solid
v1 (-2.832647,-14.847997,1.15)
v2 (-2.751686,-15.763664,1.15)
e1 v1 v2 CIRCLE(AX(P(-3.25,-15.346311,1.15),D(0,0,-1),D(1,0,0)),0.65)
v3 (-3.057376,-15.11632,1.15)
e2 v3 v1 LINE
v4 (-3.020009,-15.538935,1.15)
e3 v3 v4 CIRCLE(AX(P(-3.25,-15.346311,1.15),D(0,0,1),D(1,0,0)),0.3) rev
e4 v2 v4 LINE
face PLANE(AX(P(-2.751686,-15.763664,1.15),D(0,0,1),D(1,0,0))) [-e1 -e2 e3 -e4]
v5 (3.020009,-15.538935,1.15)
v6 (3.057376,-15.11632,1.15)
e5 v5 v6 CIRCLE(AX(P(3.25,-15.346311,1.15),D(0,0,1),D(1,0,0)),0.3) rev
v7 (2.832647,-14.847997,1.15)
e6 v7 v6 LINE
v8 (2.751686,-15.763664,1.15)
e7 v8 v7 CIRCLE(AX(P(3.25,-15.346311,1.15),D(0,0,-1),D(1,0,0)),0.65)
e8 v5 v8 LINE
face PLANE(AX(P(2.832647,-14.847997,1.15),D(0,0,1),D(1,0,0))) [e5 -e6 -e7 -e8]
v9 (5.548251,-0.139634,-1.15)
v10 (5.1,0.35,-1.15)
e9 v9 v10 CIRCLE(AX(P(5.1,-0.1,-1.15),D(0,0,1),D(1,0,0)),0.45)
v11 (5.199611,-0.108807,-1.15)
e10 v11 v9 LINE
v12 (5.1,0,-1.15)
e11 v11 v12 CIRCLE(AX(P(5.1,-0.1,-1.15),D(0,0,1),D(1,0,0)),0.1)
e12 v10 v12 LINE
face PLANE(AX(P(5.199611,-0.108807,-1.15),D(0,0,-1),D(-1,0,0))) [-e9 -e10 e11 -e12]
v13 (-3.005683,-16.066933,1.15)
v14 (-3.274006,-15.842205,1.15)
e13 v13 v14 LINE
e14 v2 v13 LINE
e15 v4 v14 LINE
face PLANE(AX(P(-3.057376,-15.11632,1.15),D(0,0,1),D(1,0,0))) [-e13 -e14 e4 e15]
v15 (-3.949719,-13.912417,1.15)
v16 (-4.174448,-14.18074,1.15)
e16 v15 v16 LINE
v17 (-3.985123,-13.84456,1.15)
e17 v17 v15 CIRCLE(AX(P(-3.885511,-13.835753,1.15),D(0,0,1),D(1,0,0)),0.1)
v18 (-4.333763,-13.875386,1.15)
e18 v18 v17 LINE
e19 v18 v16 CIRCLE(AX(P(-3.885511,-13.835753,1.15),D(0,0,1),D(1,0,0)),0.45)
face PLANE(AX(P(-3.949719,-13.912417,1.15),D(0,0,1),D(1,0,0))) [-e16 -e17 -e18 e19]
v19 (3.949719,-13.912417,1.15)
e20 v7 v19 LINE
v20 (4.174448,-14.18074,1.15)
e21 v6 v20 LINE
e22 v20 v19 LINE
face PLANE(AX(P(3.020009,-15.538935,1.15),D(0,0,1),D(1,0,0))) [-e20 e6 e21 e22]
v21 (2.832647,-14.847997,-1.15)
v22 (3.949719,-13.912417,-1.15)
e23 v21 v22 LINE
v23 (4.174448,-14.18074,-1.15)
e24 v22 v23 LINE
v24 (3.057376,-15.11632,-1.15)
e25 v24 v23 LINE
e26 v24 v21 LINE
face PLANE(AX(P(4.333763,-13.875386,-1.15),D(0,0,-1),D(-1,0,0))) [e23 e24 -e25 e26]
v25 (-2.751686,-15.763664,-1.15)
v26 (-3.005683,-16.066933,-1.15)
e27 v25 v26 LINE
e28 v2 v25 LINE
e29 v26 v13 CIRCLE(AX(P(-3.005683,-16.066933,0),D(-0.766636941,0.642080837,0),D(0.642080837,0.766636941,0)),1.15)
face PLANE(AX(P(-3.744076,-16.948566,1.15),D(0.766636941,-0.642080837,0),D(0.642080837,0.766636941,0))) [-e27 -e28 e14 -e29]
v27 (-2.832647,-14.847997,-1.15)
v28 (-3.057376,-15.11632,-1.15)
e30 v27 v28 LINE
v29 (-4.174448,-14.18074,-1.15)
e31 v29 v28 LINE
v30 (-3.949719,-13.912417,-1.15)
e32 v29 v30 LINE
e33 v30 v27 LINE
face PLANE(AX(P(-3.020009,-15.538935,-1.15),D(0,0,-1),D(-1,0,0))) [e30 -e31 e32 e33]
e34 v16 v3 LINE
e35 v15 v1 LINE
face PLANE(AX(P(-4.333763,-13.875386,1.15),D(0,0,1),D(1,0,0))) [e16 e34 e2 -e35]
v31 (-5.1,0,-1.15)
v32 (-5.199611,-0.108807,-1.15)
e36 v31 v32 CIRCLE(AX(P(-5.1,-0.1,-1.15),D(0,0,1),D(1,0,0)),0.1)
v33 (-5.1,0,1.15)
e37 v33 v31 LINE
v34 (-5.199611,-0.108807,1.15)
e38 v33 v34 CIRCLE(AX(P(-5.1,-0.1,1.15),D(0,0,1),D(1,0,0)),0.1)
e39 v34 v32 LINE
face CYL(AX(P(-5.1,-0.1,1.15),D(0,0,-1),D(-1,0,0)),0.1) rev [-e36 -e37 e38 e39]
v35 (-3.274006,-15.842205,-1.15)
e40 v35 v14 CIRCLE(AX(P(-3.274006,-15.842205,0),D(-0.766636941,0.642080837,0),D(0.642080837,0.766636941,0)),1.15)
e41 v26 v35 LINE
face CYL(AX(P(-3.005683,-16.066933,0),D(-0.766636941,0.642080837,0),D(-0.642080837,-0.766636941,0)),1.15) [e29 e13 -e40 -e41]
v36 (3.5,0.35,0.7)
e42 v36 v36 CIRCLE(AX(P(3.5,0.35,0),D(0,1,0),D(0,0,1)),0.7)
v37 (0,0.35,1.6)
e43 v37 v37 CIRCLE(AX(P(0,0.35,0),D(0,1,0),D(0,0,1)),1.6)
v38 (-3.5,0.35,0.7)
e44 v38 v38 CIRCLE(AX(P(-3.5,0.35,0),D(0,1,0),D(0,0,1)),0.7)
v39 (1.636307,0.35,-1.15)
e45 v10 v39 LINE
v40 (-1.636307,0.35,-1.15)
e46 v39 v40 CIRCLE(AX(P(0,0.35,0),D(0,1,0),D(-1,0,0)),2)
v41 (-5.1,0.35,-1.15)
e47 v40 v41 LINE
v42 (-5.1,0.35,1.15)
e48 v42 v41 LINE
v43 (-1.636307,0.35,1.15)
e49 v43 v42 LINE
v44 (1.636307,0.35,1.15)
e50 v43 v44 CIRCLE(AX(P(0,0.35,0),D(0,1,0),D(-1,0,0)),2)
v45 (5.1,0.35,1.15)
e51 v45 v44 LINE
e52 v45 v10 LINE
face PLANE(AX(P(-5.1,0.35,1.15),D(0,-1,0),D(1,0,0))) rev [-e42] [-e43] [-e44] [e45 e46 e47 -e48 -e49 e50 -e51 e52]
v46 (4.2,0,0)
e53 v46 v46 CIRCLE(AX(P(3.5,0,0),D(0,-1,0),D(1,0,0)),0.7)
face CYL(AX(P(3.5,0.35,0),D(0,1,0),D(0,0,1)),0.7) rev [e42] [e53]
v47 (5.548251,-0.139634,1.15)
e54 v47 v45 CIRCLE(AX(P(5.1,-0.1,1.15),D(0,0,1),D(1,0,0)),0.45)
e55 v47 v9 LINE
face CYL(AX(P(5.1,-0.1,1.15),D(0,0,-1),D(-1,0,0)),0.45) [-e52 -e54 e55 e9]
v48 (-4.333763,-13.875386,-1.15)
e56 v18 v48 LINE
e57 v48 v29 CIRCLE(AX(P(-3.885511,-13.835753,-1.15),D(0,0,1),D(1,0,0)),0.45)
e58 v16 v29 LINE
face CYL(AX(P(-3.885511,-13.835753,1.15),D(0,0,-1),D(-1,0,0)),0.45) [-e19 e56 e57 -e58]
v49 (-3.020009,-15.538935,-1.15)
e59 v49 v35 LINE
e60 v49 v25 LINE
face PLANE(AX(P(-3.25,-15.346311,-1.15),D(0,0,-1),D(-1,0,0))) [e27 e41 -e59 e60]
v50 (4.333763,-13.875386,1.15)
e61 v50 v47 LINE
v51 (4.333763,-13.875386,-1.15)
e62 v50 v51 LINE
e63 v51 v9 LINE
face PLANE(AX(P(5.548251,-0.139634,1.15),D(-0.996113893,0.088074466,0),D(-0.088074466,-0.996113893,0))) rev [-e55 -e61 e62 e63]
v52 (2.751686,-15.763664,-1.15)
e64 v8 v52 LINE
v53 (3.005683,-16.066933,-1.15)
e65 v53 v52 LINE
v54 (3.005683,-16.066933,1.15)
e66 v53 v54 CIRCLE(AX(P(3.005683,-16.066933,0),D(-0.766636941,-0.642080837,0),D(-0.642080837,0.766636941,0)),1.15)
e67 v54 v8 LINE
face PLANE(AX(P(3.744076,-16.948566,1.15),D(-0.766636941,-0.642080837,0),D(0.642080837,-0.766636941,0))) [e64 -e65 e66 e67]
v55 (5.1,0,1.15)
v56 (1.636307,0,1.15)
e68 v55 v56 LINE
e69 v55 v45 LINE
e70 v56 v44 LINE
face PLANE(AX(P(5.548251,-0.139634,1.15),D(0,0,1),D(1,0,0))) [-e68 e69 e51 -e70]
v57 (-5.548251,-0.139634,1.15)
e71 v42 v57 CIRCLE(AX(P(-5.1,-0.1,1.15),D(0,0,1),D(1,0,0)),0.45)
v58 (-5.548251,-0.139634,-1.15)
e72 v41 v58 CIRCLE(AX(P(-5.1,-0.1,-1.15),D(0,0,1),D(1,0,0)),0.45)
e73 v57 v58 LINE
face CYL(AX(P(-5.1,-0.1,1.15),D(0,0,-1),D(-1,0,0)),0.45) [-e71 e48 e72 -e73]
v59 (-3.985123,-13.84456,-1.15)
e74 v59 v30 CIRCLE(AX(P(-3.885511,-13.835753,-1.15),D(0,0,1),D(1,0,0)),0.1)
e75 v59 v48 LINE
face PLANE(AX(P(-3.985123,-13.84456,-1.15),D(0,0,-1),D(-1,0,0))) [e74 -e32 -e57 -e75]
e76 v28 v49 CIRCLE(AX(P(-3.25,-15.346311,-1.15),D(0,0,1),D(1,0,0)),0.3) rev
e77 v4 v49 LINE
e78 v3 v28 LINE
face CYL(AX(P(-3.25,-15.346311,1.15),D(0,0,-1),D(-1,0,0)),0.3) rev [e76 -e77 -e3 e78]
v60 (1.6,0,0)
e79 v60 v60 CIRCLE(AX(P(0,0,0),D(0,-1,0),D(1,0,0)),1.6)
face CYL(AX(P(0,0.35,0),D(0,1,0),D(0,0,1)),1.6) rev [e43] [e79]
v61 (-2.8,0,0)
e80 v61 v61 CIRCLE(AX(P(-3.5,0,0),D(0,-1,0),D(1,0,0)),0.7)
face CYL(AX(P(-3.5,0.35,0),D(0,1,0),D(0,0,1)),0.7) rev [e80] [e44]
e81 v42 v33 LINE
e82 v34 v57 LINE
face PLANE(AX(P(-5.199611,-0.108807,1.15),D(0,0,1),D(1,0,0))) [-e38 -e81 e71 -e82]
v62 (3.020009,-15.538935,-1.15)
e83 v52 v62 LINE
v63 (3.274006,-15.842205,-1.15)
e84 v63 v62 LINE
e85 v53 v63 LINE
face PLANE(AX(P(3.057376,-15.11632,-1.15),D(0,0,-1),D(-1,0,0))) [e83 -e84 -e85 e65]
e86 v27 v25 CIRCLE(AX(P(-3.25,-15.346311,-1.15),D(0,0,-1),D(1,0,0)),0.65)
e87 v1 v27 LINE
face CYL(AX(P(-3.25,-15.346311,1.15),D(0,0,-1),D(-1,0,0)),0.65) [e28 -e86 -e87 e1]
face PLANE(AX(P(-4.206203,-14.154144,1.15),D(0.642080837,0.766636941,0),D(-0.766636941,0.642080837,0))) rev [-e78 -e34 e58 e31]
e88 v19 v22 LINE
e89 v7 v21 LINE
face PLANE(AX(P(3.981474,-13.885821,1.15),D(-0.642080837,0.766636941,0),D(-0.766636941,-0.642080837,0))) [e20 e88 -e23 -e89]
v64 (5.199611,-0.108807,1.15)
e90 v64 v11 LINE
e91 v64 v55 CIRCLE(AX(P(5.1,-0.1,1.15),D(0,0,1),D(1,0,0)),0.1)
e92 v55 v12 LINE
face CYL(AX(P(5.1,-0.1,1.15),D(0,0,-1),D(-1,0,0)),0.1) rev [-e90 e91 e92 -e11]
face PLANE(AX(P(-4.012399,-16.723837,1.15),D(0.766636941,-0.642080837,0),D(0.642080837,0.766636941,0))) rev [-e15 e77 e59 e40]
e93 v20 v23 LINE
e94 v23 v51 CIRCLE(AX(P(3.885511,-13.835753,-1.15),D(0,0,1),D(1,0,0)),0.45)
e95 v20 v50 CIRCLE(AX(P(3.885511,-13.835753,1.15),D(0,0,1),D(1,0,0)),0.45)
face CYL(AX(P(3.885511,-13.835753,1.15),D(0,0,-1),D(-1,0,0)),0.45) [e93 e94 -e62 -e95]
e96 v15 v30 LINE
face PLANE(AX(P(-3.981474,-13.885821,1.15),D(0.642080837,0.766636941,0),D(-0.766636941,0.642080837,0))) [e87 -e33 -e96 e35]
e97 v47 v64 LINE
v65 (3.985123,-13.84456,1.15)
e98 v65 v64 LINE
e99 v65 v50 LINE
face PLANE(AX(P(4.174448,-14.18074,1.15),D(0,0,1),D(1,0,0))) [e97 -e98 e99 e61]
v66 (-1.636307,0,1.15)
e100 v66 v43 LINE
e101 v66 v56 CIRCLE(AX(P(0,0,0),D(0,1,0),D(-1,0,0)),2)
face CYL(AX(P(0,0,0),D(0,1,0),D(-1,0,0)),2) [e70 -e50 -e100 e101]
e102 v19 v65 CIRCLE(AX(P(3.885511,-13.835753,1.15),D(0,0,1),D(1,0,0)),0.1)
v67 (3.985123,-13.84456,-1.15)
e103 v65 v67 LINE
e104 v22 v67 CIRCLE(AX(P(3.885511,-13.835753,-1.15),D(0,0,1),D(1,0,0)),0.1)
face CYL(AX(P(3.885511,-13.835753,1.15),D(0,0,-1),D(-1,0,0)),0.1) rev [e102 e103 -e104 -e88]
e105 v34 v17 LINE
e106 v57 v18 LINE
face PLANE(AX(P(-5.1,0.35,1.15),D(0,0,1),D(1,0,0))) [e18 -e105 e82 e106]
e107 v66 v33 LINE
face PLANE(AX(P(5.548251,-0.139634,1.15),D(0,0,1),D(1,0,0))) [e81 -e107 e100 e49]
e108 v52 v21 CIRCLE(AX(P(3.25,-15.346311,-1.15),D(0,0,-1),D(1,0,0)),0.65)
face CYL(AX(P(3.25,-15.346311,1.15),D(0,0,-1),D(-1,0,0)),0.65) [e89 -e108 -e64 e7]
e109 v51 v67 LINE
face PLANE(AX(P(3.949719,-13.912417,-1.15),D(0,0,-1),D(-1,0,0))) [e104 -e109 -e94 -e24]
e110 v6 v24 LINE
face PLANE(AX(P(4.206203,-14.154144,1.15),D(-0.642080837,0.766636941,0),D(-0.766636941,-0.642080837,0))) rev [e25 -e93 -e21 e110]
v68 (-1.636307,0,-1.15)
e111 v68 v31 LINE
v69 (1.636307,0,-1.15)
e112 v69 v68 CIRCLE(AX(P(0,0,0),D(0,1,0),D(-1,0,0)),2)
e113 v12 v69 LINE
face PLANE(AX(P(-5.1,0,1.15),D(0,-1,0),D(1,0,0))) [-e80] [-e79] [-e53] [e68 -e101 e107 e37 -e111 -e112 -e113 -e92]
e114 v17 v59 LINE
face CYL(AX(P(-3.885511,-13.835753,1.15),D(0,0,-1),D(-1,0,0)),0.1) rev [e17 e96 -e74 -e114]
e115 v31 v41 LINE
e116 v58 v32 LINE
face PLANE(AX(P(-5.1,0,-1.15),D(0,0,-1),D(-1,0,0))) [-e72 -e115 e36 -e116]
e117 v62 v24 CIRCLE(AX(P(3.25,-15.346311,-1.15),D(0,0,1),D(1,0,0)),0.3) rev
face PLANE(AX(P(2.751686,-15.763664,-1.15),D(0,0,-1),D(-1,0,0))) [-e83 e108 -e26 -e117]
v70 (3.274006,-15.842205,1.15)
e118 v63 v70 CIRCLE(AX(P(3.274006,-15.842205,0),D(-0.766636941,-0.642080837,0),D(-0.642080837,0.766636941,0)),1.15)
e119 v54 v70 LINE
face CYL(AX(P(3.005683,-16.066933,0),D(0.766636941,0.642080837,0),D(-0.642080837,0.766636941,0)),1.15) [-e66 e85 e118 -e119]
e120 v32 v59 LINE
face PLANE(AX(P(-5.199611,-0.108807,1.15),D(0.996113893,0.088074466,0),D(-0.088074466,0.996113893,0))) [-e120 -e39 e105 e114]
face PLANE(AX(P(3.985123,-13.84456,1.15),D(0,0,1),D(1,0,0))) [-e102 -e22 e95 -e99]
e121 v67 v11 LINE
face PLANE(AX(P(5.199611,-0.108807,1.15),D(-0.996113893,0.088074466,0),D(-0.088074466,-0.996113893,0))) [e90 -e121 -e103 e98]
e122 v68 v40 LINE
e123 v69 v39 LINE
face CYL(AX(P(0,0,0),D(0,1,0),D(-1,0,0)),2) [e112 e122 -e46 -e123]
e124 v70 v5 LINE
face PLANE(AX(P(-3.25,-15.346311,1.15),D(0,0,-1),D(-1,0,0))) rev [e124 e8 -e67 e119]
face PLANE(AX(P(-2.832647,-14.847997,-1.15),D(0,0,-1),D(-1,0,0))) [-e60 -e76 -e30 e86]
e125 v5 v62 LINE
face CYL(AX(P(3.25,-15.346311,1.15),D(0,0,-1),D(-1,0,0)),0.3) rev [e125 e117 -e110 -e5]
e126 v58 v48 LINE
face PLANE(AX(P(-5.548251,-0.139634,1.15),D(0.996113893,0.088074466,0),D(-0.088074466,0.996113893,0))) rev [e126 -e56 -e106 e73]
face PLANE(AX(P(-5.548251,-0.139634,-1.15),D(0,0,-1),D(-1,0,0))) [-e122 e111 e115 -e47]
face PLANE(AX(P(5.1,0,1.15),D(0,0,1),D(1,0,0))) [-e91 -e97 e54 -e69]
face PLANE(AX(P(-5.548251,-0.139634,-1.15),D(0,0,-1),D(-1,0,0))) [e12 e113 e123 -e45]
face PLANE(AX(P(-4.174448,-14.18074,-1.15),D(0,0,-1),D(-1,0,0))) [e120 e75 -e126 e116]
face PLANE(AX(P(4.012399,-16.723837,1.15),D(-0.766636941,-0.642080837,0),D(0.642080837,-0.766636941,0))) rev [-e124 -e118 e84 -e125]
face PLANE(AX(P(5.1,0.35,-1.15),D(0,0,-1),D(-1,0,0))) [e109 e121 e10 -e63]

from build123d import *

# Parameters (mm, degrees)
BASE_FLANGE1_DEPTH             = 1.15
TAB1_DEPTH                     = 0.35
F_3_2_3_2_DIAMETER_HOLE1_D     = 3.2
F_1_4_1_4_DIAMETER_HOLE1_D     = 1.4
F_1_4_1_4_DIAMETER_HOLE1_DEPTH = 0.35
CUT_EXTRUDE1_DEPTH             = 10


# Sheet-metal steps are written as plain solids
with BuildPart() as part:
    # Sketch80 → Base-Flange1 (new, symmetric)
    with BuildSketch(Plane.XY):
        with BuildLine():
            Line((3.744076121, -16.948565679), (2.751685988, -15.763663573))
            ThreePointArc((2.751685988, -15.763663573), (2.602525969, -15.289062626), (2.832647456, -14.847997018))
            Line((2.832647456, -14.847997018), (3.949719342, -13.912416676))
            ThreePointArc((3.949719342, -13.912416676), (3.974169718, -13.88200963), (3.985122647, -13.844560429))
            Line((3.985122647, -13.844560429), (5.199611389, -0.108807447))
            ThreePointArc((5.199611389, -0.108807447), (5.17375888, -0.032474985), (5.1, 0))
            Line((5.1, 0), (-5.1, 0))
            ThreePointArc((-5.1, 0), (-5.17375888, -0.032474985), (-5.199611389, -0.108807447))
            Line((-5.199611389, -0.108807447), (-3.985122647, -13.844560429))
            ThreePointArc((-3.985122647, -13.844560429), (-3.974169718, -13.88200963), (-3.949719342, -13.912416676))
            Line((-3.949719342, -13.912416676), (-2.832647456, -14.847997018))
            ThreePointArc((-2.832647456, -14.847997018), (-2.602525969, -15.289062626), (-2.751685988, -15.763663573))
            Line((-2.751685988, -15.763663573), (-3.744076121, -16.948565679))
            Line((-3.744076121, -16.948565679), (-4.01239905, -16.723837386))
            Line((-4.01239905, -16.723837386), (-3.020008918, -15.53893528))
            ThreePointArc((-3.020008918, -15.53893528), (-2.951165832, -15.319888689), (-3.057375749, -15.116319947))
            Line((-3.057375749, -15.116319947), (-4.174447634, -14.180739606))
            ThreePointArc((-4.174447634, -14.180739606), (-4.284474328, -14.043907898), (-4.33376251, -13.875386492))
            Line((-4.33376251, -13.875386492), (-5.548251252, -0.13963351))
            ThreePointArc((-5.548251252, -0.13963351), (-5.431914959, 0.203862568), (-5.1, 0.35))
            Line((-5.1, 0.35), (5.1, 0.35))
            ThreePointArc((5.1, 0.35), (5.431914959, 0.203862568), (5.548251252, -0.13963351))
            Line((5.548251252, -0.13963351), (4.33376251, -13.875386492))
            ThreePointArc((4.33376251, -13.875386492), (4.284474328, -14.043907898), (4.174447634, -14.180739606))
            Line((4.174447634, -14.180739606), (3.057375749, -15.116319947))
            ThreePointArc((3.057375749, -15.116319947), (2.951165832, -15.319888689), (3.020008918, -15.53893528))
            Line((3.020008918, -15.53893528), (4.01239905, -16.723837386))
            Line((4.01239905, -16.723837386), (3.744076121, -16.948565679))
        make_face()
    extrude(amount=BASE_FLANGE1_DEPTH, both=True)

    # Sketch81 → Tab1 (add)
    with BuildSketch(Plane(origin=(0, 0.35, 0), x_dir=(1, 0, 0), z_dir=(0, 1, 0))):
        with BuildLine():
            Line((-1.636306817, 1.15), (1.636306817, 1.15))
            ThreePointArc((1.636306817, 1.15), (0, 2), (-1.636306817, 1.15))
        make_face()
        with BuildLine():
            Line((-1.636306817, -1.15), (1.636306817, -1.15))
            ThreePointArc((1.636306817, -1.15), (0, -2), (-1.636306817, -1.15))
        make_face()
    extrude(amount=-TAB1_DEPTH)

    # Ø3.2 (3.2) Diameter Hole1 (through all)
    with Locations(Plane(origin=(0, 0.35, 0), x_dir=(1, 0, 0), z_dir=(0, 1, 0))):
        with Locations((0, 0)):
            Hole(F_3_2_3_2_DIAMETER_HOLE1_D / 2)

    # Ø1.4 (1.4) Diameter Hole1
    with Locations(Plane(origin=(0, 0.35, 0), x_dir=(1, 0, 0), z_dir=(0, 1, 0))):
        with Locations((-3.5, 0), (3.5, 0)):
            Hole(F_1_4_1_4_DIAMETER_HOLE1_D / 2, depth=F_1_4_1_4_DIAMETER_HOLE1_DEPTH)

    # Sketch90 → Cut-Extrude1 (cut)
    with BuildSketch(Plane(origin=(-5.873973903, -4.919624761, 0), x_dir=(0, 0, -1), z_dir=(0.7666369409597348, 0.6420808366209819, 0))):
        with BuildLine():
            Line((-1.15, -15.897396074), (-1.15, -14.247396074))
            ThreePointArc((-1.15, -14.247396074), (0, -15.397396074), (1.15, -14.247396074))
            Line((1.15, -14.247396074), (1.15, -15.897396074))
            Line((1.15, -15.897396074), (-1.15, -15.897396074))
        make_face()
    cut_extrude1 = extrude(amount=-CUT_EXTRUDE1_DEPTH, mode=Mode.SUBTRACT)

    # Mirror1: Cut-Extrude1 across plane
    add(cut_extrude1.mirror(Plane(origin=(0, 0, 0), x_dir=(0, 0, 1), z_dir=(1, 0, 0))), mode=Mode.SUBTRACT)


solid = part.part
